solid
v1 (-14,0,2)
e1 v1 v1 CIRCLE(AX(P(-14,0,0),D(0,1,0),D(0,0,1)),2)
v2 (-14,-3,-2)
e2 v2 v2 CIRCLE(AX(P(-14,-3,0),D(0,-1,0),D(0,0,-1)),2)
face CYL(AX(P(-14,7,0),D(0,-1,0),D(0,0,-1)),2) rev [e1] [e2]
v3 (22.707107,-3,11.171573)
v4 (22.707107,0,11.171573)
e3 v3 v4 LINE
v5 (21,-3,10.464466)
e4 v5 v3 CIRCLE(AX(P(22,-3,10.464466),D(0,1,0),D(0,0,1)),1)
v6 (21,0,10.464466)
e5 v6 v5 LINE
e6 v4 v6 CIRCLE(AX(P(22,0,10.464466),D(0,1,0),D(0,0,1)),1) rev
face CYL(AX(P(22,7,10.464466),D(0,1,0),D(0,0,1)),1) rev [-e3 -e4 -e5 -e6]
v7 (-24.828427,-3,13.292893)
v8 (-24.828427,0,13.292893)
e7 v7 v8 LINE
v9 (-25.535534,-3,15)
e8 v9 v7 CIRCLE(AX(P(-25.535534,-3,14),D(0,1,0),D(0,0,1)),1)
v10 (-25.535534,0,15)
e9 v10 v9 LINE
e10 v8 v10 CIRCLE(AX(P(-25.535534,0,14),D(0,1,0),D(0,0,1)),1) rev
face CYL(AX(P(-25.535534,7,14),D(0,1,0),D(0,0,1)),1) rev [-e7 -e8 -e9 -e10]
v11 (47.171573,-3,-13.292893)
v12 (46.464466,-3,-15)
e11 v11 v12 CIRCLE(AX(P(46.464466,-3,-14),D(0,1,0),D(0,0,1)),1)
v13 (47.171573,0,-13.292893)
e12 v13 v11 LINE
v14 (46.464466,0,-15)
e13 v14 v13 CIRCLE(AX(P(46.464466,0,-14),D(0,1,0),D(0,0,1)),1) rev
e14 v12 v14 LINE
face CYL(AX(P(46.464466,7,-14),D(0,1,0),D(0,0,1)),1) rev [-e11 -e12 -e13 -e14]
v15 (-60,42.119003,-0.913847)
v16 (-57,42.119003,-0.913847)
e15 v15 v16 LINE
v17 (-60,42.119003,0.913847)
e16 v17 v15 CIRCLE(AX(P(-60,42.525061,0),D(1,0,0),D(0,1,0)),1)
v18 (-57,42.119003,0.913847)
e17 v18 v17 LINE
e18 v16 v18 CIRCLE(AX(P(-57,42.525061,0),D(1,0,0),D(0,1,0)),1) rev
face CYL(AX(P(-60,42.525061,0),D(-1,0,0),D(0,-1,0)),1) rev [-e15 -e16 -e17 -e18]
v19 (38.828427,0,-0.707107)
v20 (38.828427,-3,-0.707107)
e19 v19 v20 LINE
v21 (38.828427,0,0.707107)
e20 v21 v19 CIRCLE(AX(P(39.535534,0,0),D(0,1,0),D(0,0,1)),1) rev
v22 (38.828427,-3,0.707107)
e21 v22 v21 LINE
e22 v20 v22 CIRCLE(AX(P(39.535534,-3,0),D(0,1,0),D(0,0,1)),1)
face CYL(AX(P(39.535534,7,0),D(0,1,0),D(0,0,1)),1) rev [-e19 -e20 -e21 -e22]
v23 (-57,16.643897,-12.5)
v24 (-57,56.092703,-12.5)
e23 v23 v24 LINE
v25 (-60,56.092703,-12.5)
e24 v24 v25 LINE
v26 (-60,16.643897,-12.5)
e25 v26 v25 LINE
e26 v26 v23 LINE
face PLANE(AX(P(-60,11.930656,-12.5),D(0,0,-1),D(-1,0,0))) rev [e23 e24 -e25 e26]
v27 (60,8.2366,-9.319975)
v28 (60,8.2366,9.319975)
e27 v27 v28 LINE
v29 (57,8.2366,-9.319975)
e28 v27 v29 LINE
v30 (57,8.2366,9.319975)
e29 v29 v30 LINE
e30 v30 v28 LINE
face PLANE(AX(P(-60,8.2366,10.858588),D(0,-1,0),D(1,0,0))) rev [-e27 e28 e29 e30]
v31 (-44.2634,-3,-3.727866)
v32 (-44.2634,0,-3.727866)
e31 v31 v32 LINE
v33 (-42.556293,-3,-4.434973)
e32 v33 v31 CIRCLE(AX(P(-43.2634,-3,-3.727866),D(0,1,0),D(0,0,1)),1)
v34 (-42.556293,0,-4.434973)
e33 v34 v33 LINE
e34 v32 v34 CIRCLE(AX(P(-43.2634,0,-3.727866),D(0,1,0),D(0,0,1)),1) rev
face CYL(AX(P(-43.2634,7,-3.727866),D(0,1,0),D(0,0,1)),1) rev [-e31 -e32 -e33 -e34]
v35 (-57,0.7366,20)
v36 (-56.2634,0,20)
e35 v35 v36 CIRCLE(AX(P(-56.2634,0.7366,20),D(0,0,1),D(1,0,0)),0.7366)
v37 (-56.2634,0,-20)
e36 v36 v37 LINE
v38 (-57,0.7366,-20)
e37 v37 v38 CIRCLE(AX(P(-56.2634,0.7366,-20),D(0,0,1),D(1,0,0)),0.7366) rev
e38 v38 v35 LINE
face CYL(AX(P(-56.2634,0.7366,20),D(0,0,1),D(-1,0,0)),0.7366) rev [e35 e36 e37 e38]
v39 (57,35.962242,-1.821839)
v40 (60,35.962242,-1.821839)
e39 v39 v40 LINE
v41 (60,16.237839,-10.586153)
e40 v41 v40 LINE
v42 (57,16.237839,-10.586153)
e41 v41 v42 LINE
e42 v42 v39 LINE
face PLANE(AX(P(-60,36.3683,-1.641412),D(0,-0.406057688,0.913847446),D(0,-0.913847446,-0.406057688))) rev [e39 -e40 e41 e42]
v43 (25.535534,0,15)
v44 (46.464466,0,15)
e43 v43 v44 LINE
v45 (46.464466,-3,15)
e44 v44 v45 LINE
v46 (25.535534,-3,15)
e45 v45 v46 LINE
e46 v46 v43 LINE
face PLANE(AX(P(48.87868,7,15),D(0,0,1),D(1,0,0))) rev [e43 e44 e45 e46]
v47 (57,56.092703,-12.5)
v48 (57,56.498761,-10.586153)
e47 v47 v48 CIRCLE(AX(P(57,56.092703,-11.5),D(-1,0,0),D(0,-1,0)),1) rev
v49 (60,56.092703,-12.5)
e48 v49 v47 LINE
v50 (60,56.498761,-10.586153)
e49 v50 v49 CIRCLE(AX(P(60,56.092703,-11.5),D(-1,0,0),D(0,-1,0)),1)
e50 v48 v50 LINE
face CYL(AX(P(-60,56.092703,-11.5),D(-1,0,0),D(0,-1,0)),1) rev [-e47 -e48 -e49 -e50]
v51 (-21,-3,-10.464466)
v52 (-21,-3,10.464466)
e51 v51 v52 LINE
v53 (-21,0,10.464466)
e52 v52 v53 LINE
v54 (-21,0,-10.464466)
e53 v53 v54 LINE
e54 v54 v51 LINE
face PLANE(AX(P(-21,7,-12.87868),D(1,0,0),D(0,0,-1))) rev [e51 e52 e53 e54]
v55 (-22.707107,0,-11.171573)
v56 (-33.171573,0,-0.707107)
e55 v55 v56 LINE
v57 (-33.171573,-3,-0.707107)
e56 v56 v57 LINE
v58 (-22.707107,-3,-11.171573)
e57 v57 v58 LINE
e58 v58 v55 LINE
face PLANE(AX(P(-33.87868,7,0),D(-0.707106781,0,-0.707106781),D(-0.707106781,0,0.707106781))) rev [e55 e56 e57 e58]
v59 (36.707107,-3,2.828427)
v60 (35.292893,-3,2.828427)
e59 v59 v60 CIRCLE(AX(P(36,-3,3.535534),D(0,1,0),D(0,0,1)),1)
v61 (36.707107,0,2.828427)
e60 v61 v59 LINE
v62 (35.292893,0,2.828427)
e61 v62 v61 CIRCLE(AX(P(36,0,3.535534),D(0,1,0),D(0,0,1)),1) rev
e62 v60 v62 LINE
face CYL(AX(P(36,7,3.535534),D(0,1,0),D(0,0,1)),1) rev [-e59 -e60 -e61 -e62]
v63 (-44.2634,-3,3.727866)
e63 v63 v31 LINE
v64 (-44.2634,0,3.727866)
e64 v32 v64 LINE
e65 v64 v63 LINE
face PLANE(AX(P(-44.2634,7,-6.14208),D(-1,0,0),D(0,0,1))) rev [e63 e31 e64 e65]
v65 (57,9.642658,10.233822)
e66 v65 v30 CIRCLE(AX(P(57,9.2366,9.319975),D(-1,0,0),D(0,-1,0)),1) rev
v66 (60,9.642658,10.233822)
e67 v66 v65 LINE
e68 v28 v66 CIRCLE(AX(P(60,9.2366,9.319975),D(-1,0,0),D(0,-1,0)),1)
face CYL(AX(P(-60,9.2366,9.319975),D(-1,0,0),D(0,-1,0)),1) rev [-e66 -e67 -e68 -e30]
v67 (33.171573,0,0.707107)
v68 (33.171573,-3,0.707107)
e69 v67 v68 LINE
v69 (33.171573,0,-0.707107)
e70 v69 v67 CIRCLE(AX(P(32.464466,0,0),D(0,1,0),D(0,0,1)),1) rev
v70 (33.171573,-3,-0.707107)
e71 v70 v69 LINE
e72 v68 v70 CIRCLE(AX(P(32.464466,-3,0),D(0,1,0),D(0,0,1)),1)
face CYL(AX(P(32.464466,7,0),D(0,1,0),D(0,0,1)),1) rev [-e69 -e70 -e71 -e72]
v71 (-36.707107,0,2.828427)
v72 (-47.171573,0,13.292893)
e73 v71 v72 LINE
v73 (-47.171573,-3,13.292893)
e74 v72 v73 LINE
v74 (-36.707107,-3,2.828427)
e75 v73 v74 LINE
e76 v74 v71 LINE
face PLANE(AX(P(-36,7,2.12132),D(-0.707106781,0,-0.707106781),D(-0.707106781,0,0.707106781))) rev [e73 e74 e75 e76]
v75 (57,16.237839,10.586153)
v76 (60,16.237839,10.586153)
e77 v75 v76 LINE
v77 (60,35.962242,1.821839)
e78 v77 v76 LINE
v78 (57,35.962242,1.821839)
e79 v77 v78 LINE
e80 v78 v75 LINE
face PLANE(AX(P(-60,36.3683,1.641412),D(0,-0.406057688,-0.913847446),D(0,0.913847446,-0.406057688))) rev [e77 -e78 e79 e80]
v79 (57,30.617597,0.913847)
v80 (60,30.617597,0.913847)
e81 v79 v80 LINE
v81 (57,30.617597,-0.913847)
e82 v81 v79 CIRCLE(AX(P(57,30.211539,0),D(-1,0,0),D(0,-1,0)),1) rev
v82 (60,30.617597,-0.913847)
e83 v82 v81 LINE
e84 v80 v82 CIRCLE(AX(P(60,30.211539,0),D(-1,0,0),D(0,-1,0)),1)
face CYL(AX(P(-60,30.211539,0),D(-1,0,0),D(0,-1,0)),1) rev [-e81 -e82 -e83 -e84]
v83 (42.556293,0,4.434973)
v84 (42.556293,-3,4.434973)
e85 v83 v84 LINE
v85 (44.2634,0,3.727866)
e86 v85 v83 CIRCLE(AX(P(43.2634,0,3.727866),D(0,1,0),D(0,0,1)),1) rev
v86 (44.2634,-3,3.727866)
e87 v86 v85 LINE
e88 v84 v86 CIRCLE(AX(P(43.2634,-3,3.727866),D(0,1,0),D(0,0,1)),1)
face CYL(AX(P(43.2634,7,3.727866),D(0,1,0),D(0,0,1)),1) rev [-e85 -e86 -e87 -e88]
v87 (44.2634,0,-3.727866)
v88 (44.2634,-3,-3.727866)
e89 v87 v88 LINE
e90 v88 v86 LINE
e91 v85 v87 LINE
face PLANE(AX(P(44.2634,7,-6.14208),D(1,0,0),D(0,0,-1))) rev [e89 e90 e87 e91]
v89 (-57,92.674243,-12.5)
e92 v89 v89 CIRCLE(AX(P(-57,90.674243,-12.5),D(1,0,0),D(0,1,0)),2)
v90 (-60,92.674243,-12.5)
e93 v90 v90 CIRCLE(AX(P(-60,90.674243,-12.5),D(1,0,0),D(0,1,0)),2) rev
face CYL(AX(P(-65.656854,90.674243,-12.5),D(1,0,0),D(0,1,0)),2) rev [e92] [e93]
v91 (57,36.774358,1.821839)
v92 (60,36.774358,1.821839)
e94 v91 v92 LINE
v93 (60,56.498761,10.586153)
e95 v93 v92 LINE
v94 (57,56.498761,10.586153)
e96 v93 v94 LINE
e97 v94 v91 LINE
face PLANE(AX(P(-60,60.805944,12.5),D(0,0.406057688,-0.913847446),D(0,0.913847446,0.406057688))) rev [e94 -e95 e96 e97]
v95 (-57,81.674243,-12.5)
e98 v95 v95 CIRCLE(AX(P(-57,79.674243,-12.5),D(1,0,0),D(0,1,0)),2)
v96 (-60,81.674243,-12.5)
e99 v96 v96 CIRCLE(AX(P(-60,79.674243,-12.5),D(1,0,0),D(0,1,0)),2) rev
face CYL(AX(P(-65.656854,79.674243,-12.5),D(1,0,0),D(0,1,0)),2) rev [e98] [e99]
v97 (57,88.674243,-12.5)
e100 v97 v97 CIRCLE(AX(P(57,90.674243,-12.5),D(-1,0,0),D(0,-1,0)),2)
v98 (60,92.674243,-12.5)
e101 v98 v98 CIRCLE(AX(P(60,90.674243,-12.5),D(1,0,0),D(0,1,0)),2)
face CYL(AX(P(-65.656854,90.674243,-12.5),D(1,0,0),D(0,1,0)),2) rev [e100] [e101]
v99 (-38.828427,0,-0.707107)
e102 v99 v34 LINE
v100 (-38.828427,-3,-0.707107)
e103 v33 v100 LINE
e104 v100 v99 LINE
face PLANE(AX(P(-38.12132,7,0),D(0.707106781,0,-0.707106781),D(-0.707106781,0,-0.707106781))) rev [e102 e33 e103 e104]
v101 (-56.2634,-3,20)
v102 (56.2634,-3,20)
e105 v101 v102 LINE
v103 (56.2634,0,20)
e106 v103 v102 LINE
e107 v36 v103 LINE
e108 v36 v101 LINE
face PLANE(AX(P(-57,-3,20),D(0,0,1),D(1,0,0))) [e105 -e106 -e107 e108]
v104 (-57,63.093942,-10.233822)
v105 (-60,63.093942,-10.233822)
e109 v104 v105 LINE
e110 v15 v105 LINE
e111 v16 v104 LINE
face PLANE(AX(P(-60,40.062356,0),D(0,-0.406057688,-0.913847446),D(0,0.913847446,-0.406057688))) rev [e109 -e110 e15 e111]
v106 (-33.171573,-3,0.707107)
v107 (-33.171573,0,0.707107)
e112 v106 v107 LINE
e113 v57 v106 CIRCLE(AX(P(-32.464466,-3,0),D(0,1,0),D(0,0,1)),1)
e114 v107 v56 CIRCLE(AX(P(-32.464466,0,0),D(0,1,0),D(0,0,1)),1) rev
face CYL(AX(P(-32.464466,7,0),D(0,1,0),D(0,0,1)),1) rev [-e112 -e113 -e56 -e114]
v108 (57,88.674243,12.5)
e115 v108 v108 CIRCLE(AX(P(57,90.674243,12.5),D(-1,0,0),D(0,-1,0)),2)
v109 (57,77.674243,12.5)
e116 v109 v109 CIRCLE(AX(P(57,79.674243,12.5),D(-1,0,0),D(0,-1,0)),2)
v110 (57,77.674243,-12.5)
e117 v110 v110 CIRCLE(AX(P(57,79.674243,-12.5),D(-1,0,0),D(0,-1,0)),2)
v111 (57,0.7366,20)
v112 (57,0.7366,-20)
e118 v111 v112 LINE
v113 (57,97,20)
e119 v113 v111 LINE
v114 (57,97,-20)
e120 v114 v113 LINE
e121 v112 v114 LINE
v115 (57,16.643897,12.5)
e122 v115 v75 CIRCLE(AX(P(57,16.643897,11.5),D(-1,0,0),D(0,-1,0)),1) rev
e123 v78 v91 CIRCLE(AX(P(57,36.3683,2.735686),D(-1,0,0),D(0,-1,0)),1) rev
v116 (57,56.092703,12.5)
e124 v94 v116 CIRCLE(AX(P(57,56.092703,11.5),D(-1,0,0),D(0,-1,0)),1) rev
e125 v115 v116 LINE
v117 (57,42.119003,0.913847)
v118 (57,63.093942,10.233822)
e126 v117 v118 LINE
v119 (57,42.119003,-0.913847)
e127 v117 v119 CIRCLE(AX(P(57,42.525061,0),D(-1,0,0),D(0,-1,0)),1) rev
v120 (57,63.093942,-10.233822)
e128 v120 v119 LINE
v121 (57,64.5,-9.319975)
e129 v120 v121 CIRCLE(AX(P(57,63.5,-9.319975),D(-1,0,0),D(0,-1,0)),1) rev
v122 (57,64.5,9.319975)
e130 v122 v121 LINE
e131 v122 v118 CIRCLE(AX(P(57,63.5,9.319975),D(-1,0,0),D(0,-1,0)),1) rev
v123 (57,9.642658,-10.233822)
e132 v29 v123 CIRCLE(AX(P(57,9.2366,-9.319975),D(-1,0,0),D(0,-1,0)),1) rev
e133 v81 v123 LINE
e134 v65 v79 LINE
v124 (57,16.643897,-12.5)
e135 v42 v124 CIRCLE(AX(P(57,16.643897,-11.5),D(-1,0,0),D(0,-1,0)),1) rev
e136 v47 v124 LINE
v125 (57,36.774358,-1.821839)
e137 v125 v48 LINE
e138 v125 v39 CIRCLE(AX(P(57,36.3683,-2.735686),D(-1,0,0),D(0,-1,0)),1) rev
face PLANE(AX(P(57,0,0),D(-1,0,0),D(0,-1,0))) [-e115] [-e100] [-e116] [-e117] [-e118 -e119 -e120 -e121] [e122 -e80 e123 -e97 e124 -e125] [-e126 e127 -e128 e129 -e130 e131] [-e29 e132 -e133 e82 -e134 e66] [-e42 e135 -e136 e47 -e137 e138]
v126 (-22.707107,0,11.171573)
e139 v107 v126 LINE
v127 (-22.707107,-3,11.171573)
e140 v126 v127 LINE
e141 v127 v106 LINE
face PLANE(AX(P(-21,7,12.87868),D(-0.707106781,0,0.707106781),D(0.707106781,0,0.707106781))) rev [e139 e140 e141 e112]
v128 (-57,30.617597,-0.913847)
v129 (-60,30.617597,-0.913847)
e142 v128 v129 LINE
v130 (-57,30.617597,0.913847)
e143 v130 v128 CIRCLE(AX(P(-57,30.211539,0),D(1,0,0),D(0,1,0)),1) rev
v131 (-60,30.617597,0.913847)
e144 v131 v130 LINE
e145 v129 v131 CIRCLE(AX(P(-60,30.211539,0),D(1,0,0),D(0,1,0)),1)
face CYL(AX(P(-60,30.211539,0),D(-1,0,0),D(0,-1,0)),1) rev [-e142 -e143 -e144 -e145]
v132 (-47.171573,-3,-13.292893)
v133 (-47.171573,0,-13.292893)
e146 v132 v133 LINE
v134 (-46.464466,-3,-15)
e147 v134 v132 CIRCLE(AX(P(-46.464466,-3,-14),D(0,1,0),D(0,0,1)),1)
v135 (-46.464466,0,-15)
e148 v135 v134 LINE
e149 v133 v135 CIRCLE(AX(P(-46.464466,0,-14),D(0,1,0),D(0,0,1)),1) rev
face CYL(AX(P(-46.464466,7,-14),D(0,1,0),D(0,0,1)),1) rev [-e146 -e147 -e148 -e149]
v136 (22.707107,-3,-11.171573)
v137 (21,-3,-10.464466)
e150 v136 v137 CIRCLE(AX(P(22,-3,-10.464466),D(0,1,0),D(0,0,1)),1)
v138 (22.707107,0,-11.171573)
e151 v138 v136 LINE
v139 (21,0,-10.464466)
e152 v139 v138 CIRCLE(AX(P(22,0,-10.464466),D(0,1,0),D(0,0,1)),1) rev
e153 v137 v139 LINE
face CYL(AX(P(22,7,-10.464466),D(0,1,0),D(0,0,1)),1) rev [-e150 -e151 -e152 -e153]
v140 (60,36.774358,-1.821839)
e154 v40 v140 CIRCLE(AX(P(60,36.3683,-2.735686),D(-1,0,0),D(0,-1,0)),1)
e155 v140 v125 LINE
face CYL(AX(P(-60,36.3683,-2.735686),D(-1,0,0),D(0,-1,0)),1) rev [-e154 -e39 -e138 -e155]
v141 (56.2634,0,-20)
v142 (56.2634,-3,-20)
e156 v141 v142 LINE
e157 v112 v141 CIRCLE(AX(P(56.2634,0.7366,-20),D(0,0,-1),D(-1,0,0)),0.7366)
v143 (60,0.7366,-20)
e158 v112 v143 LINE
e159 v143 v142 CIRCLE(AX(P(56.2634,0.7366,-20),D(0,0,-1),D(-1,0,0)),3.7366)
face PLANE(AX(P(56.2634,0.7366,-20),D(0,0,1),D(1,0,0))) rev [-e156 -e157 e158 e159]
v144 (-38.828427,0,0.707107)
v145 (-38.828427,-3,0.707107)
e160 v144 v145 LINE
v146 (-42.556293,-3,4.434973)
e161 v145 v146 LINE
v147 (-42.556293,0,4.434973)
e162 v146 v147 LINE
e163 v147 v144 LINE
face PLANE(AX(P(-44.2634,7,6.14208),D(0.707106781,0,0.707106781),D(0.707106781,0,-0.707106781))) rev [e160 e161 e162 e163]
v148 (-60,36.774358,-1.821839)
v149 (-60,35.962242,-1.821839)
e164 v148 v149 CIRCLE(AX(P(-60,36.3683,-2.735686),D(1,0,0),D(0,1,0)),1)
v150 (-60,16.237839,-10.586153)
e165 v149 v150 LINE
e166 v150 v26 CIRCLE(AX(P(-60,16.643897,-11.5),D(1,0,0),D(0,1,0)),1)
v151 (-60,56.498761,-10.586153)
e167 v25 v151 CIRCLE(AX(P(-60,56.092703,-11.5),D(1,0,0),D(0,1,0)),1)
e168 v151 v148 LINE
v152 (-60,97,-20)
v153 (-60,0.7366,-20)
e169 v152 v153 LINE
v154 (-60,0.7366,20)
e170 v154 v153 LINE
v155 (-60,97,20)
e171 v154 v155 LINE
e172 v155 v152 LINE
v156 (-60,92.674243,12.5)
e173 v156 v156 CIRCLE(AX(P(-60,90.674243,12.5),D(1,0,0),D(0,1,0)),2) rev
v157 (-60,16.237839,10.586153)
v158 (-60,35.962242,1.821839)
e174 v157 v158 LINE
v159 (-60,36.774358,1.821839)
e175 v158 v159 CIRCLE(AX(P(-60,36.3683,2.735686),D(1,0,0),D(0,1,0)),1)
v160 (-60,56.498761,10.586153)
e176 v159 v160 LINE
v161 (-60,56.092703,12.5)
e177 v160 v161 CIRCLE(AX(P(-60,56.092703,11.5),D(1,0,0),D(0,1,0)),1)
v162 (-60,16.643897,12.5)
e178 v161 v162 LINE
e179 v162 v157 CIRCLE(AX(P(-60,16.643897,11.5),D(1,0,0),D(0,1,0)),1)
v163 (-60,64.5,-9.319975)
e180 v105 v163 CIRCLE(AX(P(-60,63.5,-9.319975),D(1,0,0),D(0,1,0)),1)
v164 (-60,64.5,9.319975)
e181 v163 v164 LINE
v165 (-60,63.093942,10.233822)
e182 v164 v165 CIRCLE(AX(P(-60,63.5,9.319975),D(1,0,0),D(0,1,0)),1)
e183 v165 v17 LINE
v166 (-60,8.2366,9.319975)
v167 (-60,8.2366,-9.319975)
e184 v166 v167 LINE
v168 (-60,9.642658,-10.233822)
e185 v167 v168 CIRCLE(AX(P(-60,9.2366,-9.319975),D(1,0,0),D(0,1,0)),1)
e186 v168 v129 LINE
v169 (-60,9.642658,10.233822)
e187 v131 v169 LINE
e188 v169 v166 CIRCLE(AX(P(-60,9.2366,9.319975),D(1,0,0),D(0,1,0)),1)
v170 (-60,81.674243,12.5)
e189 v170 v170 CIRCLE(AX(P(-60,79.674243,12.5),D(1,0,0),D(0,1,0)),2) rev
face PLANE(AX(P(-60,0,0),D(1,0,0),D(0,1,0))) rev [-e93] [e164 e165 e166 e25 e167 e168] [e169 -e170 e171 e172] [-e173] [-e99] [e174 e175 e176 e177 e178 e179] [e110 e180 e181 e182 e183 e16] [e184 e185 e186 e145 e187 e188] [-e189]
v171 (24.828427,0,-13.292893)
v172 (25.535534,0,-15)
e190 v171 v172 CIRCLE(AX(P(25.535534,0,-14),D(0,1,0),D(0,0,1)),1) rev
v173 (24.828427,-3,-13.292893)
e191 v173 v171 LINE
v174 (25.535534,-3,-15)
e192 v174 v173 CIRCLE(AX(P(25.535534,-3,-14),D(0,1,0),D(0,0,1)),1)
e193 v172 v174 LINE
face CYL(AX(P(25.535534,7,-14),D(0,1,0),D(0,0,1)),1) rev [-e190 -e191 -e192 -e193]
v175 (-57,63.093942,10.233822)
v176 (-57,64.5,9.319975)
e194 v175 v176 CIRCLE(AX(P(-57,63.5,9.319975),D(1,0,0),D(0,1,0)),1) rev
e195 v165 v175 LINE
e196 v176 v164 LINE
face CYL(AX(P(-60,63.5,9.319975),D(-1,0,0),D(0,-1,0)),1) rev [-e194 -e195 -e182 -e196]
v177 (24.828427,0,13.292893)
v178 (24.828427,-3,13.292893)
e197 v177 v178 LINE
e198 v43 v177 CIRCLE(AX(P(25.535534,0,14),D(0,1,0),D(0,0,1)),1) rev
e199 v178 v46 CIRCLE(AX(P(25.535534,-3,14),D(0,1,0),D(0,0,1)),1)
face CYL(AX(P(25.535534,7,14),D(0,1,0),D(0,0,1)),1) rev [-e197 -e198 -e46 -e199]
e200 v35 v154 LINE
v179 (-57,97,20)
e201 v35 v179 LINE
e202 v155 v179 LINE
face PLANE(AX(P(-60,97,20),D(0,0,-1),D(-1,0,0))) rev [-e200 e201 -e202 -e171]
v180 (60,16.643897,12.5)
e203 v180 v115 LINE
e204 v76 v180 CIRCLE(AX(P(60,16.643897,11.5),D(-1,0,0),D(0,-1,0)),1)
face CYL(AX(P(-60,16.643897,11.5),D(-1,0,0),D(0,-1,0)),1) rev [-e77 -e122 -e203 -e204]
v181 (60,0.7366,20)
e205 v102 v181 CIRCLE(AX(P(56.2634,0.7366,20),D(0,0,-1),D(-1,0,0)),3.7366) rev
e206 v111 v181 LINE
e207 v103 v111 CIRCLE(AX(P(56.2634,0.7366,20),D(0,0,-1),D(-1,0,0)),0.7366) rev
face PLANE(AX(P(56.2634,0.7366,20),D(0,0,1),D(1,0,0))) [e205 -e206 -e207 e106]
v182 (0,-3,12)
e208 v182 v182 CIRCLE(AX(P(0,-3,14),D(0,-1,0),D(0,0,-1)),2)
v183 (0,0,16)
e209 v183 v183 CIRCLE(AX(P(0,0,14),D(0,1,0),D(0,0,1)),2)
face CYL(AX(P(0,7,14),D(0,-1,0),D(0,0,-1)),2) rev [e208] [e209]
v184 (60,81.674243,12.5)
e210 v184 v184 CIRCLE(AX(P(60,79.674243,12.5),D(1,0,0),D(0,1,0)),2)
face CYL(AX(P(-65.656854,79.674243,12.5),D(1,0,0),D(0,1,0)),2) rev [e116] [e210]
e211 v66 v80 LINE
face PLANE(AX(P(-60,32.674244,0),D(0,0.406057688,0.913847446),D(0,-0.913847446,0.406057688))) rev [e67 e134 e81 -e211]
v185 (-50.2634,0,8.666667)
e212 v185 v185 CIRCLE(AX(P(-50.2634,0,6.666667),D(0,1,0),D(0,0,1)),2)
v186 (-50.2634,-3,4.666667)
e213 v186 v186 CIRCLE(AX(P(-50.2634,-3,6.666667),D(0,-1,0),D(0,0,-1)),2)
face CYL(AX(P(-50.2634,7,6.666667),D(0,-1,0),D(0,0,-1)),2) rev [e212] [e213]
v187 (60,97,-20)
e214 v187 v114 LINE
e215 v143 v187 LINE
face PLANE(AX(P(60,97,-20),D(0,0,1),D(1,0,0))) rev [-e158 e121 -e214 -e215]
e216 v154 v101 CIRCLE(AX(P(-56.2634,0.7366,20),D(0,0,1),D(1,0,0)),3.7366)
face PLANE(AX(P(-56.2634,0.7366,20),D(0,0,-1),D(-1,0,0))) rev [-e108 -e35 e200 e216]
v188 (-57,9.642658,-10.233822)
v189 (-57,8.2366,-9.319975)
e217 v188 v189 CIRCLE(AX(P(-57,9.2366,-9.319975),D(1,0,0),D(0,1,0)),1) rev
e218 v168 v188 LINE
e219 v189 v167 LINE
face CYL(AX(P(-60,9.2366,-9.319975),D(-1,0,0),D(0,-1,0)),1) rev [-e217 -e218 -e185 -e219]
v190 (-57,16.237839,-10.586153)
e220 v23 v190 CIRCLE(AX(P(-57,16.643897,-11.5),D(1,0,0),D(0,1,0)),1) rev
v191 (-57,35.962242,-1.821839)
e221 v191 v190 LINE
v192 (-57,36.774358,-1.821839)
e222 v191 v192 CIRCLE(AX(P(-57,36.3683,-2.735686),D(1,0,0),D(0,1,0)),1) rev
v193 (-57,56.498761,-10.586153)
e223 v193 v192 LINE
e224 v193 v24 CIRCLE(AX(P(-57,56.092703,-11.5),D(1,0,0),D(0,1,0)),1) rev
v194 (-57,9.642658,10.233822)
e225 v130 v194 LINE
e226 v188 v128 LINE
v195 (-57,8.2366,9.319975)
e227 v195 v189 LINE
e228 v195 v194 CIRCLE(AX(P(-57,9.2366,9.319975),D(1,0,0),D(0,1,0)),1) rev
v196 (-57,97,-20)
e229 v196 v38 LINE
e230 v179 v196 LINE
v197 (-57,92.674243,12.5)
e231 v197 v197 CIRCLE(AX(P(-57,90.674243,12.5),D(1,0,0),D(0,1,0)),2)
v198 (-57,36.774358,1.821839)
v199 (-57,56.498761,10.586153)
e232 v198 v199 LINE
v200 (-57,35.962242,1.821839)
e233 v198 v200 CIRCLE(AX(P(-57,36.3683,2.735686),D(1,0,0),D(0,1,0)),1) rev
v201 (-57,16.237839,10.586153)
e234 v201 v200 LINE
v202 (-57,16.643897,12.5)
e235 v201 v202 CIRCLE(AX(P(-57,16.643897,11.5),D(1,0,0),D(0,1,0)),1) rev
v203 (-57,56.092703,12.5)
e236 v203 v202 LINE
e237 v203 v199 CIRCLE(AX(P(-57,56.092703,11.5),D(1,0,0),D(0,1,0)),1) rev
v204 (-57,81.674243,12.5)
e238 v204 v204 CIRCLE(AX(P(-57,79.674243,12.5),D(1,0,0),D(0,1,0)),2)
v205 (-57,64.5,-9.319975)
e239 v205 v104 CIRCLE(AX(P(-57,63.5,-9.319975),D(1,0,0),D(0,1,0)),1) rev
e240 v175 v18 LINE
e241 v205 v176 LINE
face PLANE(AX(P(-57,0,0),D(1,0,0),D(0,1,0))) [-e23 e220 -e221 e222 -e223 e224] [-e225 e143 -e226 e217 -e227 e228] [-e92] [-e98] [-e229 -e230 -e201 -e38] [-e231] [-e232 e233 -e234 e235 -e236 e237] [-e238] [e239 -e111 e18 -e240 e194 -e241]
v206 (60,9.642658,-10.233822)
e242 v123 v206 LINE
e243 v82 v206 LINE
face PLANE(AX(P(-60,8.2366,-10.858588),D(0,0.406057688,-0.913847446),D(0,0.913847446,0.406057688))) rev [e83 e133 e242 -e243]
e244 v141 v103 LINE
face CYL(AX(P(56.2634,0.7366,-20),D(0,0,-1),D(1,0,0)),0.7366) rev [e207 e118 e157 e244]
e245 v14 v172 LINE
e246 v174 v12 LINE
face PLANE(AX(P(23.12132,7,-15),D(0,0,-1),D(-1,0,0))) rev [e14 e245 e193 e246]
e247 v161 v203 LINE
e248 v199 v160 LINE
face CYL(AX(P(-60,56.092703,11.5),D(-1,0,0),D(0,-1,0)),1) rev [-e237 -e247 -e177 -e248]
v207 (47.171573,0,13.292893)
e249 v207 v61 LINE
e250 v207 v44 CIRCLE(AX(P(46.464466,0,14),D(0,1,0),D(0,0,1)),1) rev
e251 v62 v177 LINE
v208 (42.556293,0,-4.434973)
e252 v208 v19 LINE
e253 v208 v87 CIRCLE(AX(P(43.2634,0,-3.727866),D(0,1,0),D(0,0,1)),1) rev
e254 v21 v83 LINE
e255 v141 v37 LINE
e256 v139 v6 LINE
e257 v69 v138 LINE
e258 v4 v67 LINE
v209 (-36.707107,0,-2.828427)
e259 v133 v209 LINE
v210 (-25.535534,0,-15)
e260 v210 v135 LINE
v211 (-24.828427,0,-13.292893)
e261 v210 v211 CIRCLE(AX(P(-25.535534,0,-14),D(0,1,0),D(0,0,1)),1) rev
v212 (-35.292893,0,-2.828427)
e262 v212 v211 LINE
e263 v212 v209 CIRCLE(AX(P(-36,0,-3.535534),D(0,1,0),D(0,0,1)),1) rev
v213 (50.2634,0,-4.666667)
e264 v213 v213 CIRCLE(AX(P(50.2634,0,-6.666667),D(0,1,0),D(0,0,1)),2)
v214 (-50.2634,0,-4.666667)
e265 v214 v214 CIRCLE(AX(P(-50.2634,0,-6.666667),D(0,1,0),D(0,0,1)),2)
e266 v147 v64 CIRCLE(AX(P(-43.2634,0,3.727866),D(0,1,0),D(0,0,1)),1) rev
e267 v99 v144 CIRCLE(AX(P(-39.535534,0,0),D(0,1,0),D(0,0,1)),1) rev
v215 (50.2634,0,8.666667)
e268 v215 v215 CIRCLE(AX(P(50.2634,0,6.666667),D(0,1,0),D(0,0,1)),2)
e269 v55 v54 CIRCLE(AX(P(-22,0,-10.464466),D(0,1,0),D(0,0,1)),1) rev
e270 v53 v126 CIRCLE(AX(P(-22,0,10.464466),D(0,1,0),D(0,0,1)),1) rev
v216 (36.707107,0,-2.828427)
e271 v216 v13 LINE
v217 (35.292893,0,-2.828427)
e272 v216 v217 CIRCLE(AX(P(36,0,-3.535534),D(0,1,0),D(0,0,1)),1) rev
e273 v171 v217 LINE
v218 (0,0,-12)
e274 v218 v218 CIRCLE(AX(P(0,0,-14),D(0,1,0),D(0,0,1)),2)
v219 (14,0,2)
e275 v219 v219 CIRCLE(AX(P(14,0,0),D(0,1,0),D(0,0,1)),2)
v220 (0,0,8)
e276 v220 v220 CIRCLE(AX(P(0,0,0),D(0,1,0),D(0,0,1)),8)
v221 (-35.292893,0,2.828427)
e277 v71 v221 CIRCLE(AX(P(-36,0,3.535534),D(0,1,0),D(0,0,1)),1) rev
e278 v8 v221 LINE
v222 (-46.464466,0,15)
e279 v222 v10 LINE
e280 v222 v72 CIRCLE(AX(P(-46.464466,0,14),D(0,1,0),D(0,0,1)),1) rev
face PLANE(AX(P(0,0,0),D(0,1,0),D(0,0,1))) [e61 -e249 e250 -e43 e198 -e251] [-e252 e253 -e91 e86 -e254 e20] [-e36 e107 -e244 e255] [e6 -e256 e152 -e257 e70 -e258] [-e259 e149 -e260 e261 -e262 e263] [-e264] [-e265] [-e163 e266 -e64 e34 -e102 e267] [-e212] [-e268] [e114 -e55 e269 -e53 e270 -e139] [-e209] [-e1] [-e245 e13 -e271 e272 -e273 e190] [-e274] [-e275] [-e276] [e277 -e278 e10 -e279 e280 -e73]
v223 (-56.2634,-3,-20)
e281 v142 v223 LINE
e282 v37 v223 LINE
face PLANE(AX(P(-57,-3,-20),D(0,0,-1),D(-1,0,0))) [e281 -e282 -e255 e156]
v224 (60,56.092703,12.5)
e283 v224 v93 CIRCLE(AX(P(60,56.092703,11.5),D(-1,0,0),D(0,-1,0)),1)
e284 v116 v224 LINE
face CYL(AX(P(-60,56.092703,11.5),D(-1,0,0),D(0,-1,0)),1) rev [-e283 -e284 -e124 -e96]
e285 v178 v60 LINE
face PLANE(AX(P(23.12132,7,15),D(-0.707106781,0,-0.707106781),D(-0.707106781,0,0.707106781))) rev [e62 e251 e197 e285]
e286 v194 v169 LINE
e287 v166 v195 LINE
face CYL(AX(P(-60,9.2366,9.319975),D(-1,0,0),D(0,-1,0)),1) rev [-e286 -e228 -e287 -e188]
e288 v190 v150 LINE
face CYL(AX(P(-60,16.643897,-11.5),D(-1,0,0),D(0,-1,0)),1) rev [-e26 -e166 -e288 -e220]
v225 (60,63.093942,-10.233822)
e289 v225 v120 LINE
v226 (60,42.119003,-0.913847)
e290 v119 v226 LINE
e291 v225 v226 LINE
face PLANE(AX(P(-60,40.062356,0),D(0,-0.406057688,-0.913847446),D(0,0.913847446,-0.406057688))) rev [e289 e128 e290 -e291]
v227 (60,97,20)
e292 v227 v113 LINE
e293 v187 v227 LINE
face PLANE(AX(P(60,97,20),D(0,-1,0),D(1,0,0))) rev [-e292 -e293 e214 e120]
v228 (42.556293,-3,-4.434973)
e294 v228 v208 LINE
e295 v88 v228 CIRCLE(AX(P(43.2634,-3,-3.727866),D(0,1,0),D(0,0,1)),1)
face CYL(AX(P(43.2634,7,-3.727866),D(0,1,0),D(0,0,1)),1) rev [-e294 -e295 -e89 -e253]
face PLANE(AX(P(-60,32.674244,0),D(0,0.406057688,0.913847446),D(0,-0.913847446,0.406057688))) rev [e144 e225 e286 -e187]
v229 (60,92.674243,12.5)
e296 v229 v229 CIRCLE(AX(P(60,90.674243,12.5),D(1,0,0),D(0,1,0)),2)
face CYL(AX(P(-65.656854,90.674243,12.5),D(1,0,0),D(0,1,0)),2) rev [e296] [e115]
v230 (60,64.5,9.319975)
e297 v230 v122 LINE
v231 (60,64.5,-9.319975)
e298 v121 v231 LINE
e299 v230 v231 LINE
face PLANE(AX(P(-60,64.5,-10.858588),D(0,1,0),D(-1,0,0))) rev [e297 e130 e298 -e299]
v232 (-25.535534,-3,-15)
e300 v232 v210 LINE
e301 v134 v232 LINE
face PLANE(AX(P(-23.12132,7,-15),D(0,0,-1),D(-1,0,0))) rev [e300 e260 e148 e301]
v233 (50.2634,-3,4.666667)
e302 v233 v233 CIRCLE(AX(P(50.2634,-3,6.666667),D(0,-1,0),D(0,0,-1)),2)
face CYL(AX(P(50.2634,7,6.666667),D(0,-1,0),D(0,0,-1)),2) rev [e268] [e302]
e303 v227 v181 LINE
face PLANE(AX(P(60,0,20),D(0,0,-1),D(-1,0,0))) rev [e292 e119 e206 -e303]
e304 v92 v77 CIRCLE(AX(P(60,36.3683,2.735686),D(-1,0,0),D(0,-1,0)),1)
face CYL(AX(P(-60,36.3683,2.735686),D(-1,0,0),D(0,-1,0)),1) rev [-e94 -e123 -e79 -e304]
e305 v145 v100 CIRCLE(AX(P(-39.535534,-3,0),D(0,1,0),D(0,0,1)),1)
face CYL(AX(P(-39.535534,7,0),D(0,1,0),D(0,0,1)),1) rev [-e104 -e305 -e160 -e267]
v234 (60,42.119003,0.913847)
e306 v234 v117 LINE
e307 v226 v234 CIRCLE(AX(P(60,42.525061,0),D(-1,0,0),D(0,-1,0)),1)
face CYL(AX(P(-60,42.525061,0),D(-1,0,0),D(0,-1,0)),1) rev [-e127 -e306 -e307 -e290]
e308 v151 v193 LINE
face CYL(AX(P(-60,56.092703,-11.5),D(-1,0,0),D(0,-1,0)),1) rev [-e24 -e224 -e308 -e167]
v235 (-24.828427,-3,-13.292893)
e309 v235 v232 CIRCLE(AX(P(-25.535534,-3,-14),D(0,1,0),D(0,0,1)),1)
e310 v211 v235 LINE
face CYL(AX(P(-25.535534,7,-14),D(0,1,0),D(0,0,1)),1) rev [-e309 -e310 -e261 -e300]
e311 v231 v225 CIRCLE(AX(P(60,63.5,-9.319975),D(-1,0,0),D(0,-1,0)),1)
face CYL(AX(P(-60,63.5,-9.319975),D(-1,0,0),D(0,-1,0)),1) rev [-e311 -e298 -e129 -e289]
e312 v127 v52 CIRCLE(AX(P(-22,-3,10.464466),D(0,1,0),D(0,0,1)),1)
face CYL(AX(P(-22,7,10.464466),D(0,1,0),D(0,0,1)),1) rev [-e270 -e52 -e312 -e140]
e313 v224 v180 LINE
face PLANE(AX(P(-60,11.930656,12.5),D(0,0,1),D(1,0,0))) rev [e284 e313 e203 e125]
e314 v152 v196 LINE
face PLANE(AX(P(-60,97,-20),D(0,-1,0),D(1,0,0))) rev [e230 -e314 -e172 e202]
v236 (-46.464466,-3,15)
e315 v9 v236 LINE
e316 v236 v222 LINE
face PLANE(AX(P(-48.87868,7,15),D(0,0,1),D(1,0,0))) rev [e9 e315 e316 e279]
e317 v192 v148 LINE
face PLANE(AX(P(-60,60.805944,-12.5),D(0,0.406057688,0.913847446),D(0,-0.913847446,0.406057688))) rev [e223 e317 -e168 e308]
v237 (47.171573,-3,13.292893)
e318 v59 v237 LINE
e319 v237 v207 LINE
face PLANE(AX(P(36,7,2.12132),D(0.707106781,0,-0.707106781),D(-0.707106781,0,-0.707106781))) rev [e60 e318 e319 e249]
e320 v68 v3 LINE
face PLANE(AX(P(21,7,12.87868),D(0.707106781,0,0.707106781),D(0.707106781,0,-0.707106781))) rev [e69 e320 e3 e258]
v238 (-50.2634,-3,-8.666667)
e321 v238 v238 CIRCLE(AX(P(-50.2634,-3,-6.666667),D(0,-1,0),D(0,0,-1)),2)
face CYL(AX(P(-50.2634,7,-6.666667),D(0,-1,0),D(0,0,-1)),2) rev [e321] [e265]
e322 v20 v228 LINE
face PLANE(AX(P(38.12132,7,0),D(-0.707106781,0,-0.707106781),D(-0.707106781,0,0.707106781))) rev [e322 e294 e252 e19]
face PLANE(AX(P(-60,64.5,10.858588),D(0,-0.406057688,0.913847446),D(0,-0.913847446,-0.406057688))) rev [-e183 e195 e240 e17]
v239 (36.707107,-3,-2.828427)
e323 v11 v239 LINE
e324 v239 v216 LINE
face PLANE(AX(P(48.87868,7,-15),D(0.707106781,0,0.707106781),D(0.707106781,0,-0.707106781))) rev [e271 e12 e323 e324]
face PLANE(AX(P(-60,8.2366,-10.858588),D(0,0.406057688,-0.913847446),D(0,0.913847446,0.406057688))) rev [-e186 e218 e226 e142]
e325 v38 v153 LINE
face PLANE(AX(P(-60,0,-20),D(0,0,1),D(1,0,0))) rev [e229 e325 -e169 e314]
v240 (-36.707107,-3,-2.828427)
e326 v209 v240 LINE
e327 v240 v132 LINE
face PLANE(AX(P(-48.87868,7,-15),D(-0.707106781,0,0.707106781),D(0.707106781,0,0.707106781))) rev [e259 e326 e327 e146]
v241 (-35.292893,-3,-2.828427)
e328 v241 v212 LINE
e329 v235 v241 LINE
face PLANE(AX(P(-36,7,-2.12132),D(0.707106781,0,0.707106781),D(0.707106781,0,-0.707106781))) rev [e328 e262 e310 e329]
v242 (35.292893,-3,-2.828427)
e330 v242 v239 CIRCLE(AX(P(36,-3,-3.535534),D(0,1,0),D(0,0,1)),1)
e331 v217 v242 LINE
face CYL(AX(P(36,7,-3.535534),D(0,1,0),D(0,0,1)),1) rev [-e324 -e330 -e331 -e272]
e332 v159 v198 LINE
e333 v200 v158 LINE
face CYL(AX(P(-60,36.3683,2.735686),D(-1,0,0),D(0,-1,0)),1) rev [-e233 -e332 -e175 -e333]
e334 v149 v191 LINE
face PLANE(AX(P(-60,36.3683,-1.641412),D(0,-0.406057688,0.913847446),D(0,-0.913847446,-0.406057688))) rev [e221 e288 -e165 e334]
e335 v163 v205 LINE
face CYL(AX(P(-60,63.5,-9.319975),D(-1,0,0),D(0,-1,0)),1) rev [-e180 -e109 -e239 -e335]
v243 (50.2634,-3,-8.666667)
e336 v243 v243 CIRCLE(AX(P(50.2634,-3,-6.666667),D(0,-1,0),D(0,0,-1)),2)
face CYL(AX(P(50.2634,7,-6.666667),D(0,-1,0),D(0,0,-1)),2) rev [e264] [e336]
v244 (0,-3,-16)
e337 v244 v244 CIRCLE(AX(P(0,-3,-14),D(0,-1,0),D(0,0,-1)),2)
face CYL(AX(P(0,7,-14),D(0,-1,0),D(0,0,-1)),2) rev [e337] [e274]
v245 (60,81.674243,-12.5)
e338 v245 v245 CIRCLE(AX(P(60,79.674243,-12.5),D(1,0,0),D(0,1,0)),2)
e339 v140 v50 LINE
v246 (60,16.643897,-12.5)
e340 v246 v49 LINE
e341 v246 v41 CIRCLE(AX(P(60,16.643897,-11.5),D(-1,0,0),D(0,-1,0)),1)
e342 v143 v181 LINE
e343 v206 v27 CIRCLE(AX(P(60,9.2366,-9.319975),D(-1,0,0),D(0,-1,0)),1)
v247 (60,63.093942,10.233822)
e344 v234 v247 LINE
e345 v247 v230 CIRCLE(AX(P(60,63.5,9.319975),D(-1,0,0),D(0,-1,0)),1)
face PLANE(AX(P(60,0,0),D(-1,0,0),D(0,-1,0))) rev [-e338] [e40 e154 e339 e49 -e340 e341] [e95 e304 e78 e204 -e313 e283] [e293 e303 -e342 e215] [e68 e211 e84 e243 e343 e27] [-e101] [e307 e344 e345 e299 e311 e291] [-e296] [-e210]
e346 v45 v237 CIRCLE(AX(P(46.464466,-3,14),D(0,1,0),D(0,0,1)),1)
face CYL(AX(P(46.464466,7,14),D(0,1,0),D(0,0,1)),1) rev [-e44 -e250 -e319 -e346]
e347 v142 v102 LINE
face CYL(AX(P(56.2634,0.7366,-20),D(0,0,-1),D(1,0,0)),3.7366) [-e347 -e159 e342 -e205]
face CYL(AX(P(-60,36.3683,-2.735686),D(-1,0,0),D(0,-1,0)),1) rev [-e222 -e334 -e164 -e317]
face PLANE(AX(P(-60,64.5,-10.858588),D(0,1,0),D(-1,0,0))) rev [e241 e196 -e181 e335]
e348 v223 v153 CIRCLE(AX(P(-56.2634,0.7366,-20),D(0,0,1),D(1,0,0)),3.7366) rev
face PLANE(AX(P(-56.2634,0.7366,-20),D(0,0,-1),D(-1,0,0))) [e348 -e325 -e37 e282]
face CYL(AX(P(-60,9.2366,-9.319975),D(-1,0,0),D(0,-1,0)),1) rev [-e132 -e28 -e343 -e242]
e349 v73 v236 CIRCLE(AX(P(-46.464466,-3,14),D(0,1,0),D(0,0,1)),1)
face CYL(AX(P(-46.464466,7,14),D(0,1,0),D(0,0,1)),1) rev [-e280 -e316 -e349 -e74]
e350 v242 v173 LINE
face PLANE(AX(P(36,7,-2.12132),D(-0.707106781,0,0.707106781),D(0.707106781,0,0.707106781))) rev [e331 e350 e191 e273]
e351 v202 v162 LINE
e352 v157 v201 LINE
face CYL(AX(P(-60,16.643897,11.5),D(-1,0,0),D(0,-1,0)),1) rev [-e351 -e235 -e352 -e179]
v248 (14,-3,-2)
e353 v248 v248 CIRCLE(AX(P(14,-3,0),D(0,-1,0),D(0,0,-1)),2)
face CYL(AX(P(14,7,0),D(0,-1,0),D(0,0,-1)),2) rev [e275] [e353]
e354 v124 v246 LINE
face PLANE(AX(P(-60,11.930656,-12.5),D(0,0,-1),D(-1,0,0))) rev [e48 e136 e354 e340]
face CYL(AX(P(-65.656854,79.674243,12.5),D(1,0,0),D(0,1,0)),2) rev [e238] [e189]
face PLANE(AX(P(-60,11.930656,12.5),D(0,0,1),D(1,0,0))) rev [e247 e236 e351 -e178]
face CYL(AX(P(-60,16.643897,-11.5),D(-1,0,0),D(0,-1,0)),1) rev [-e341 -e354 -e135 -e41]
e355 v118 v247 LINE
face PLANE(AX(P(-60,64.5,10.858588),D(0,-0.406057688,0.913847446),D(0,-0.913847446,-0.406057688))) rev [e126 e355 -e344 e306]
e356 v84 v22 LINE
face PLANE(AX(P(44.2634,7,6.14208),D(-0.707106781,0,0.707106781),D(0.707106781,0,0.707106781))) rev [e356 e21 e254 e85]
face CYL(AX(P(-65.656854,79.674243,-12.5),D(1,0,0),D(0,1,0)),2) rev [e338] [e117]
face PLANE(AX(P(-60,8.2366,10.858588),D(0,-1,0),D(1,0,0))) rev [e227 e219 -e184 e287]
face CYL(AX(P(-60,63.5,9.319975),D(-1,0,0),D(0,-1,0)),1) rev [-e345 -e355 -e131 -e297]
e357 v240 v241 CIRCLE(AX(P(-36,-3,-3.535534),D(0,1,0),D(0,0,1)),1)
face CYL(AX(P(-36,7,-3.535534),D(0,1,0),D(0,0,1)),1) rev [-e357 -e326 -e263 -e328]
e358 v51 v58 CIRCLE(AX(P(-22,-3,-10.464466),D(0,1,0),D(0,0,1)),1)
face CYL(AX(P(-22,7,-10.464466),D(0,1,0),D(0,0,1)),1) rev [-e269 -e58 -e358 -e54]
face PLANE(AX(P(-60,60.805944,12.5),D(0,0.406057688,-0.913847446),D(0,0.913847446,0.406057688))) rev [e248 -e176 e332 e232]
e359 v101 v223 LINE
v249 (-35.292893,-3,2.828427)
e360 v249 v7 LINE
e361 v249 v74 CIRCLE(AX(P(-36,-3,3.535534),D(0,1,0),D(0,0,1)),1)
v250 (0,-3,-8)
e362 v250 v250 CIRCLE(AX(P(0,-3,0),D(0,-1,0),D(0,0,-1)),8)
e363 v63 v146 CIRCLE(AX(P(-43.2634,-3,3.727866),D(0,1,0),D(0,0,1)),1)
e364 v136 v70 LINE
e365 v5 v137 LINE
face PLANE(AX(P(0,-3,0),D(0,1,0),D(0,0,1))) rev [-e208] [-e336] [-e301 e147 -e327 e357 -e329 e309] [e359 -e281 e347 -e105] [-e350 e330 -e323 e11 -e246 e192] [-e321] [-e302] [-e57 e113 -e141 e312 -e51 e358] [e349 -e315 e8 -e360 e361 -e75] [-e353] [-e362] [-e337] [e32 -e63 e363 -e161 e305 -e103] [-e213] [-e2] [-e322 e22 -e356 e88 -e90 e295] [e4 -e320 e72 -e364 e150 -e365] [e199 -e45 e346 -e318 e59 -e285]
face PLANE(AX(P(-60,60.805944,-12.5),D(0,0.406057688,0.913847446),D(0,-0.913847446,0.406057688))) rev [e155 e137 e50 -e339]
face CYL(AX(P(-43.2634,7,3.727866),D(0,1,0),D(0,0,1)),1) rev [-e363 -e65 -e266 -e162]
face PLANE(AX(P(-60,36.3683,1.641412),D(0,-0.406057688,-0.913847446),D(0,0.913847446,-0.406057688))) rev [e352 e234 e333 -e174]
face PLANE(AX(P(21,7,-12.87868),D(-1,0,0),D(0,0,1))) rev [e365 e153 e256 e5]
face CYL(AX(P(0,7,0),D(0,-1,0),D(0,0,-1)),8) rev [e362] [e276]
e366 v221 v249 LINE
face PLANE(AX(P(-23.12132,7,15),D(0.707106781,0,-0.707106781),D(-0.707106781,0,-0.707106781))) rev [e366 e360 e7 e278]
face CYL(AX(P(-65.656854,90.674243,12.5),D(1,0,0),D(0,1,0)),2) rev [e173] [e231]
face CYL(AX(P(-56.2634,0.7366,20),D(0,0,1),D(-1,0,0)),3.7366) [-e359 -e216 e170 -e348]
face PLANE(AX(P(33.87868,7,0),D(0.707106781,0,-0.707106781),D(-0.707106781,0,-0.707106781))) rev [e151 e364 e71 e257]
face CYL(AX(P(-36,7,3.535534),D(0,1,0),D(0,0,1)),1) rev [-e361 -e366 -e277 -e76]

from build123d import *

# Parameters (mm, degrees)
SKETCH3_W                    = 114
SKETCH3_H                    = 40
BASE_FLANGE1_DEPTH           = 3
EDGE_FLANGE1_STRIP_W         = 13.4732
EDGE_FLANGE1_STRIP_H         = 3
EDGE_FLANGE1_STRIP_CUT_DEPTH = 40
EDGE_FLANGE1_DEPTH           = 40
EDGE_FLANGE2_STRIP_W         = 13.4732
EDGE_FLANGE2_STRIP_H         = 3
EDGE_FLANGE2_STRIP_CUT_DEPTH = 40
EDGE_FLANGE2_DEPTH           = 40
SKETCH11_R                   = 8
SKETCH11_R_2                 = 2
CUT_EXTRUDE1_DEPTH           = 10
CUT_EXTRUDE2_REACH           = 157.592
SKETCH12_R                   = 2
CUT_EXTRUDE3_DEPTH           = 156.592416268
CUT_EXTRUDE3_DEPTH_BACK      = 156.592416268
CUT_EXTRUDE4_DEPTH           = 10
FILLET1_R                    = 1


# Sheet-metal steps are written as plain solids
with BuildPart() as part:
    # Sketch3 → Base-Flange1 (new body)
    with BuildSketch(Plane(origin=(0, 0, 0), x_dir=(1, 0, 0), z_dir=(0, 1, 0))):
        Rectangle(SKETCH3_W, SKETCH3_H)
    extrude(amount=-BASE_FLANGE1_DEPTH)

    # Edge-Flange1 strip (across the edge) → Edge-Flange1 strip cut (cut)
    with BuildSketch(Plane(origin=(-57, 0, -20), x_dir=(1, 0, 0), z_dir=(0, 0, 1))):
        with Locations((-6, -1.5)):
            Rectangle(EDGE_FLANGE1_STRIP_W, EDGE_FLANGE1_STRIP_H)
    extrude(amount=EDGE_FLANGE1_STRIP_CUT_DEPTH, mode=Mode.SUBTRACT)

    # Edge-Flange1 section (across the edge) → Edge-Flange1 (add)
    with BuildSketch(Plane(origin=(-57, 0, -20), x_dir=(1, 0, 0), z_dir=(0, 0, 1))):
        with BuildLine():
            Line((-3, 0.7366), (-3, 97))
            Line((-3, 97), (0, 97))
            Line((0, 97), (0, 0.7366))
            ThreePointArc((0, 0.7366), (0.215745145, 0.215745145), (0.7366, 0))
            Line((0.7366, 0), (0.7366, -3))
            ThreePointArc((0.7366, -3), (-1.905575199, -1.905575199), (-3, 0.7366))
        make_face()
    extrude(amount=EDGE_FLANGE1_DEPTH)

    # Edge-Flange2 strip (across the edge) → Edge-Flange2 strip cut (cut)
    with BuildSketch(Plane(origin=(57, 0, 20), x_dir=(-1, 0, 0), z_dir=(0, 0, -1))):
        with Locations((-6, -1.5)):
            Rectangle(EDGE_FLANGE2_STRIP_W, EDGE_FLANGE2_STRIP_H)
    extrude(amount=EDGE_FLANGE2_STRIP_CUT_DEPTH, mode=Mode.SUBTRACT)

    # Edge-Flange2 section (across the edge) → Edge-Flange2 (add)
    with BuildSketch(Plane(origin=(57, 0, 20), x_dir=(-1, 0, 0), z_dir=(0, 0, -1))):
        with BuildLine():
            Line((-3, 0.7366), (-3, 97))
            Line((-3, 97), (0, 97))
            Line((0, 97), (0, 0.7366))
            ThreePointArc((0, 0.7366), (0.215745145, 0.215745145), (0.7366, 0))
            Line((0.7366, 0), (0.7366, -3))
            ThreePointArc((0.7366, -3), (-1.905575199, -1.905575199), (-3, 0.7366))
        make_face()
    extrude(amount=EDGE_FLANGE2_DEPTH)

    # Sketch11 → Cut-Extrude1 (cut)
    with BuildSketch(Plane(origin=(0, -3, 0), x_dir=(-1, 0, 0), z_dir=(0, -1, 0))):
        with Locations(Location((0, 0, 0), (0, 0, 90))):
            Circle(SKETCH11_R)
        with Locations(Location((0, 14, 0), (0, 0, 90))):
            Circle(SKETCH11_R_2)
        with Locations(Location((14, 0, 0), (0, 0, 90))):
            Circle(SKETCH11_R_2)
        with Locations(Location((0, -14, 0), (0, 0, 90))):
            Circle(SKETCH11_R_2)
        with Locations(Location((-14, 0, 0), (0, 0, 90))):
            Circle(SKETCH11_R_2)
        with Locations(Location((50.2634, 6.666666667, 0), (0, 0, 90))):
            Circle(SKETCH11_R_2)
        with Locations(Location((-50.2634, 6.666666667, 0), (0, 0, 90))):
            Circle(SKETCH11_R_2)
        with Locations(Location((50.2634, -6.666666667, 0), (0, 0, 90))):
            Circle(SKETCH11_R_2)
        with Locations(Location((-50.2634, -6.666666667, 0), (0, 0, 90))):
            Circle(SKETCH11_R_2)
    extrude(amount=-CUT_EXTRUDE1_DEPTH, mode=Mode.SUBTRACT)

    # Cut-Extrude2: up to this face of the body (flat: up to its plane)
    cut_extrude2_end = Plane(part.part.faces().sort_by_distance((-60, 48.8683, 0))[0])
    # Sketch12 → Cut-Extrude2 (cut, up to the picked face)
    with BuildSketch(Plane(origin=(60, 0, 0), x_dir=(0, 0, -1), z_dir=(1, 0, 0)), mode=Mode.PRIVATE) as cut_extrude2_sk1:
        with Locations(Location((12.5, 79.674243403, 0), (0, 0, 90))):
            Circle(SKETCH12_R)
    cut_extrude2_tool1 = split(extrude(cut_extrude2_sk1.sketch, amount=-CUT_EXTRUDE2_REACH, mode=Mode.PRIVATE), bisect_by=cut_extrude2_end, keep=Keep.BOTH, mode=Mode.PRIVATE)
    # Sketch12 → Cut-Extrude2 (cut, up to the picked face)
    with BuildSketch(Plane(origin=(60, 0, 0), x_dir=(0, 0, -1), z_dir=(1, 0, 0)), mode=Mode.PRIVATE) as cut_extrude2_sk2:
        with Locations(Location((12.5, 90.674243403, 0), (0, 0, 90))):
            Circle(SKETCH12_R)
    cut_extrude2_tool2 = split(extrude(cut_extrude2_sk2.sketch, amount=-CUT_EXTRUDE2_REACH, mode=Mode.PRIVATE), bisect_by=cut_extrude2_end, keep=Keep.BOTH, mode=Mode.PRIVATE)
    # Sketch12 → Cut-Extrude2 (cut, up to the picked face)
    with BuildSketch(Plane(origin=(60, 0, 0), x_dir=(0, 0, -1), z_dir=(1, 0, 0)), mode=Mode.PRIVATE) as cut_extrude2_sk3:
        with Locations(Location((-12.5, 79.674243403, 0), (0, 0, 90))):
            Circle(SKETCH12_R)
    cut_extrude2_tool3 = split(extrude(cut_extrude2_sk3.sketch, amount=-CUT_EXTRUDE2_REACH, mode=Mode.PRIVATE), bisect_by=cut_extrude2_end, keep=Keep.BOTH, mode=Mode.PRIVATE)
    # Sketch12 → Cut-Extrude2 (cut, up to the picked face)
    with BuildSketch(Plane(origin=(60, 0, 0), x_dir=(0, 0, -1), z_dir=(1, 0, 0)), mode=Mode.PRIVATE) as cut_extrude2_sk4:
        with Locations(Location((-12.5, 90.674243403, 0), (0, 0, 90))):
            Circle(SKETCH12_R)
    cut_extrude2_tool4 = split(extrude(cut_extrude2_sk4.sketch, amount=-CUT_EXTRUDE2_REACH, mode=Mode.PRIVATE), bisect_by=cut_extrude2_end, keep=Keep.BOTH, mode=Mode.PRIVATE)
    add(cut_extrude2_tool1.solids().sort_by(Axis((60, 79.674243, -12.5), (-1, 0, 0)))[0], mode=Mode.SUBTRACT)
    add(cut_extrude2_tool2.solids().sort_by(Axis((60, 90.674243, -12.5), (-1, 0, 0)))[0], mode=Mode.SUBTRACT)
    add(cut_extrude2_tool3.solids().sort_by(Axis((60, 79.674243, 12.5), (-1, 0, 0)))[0], mode=Mode.SUBTRACT)
    add(cut_extrude2_tool4.solids().sort_by(Axis((60, 90.674243, 12.5), (-1, 0, 0)))[0], mode=Mode.SUBTRACT)

    # Sketch14 → Cut-Extrude3 (cut, two sides: drawn at the far end of the back side and taken through both)
    with BuildSketch(Plane(origin=(60, 0, 0), x_dir=(0, 0, -1), z_dir=(1, 0, 0)).offset(-CUT_EXTRUDE3_DEPTH_BACK)):
        Polygon((-12.5, 60.805943605), (-1.641411821, 36.3683), (-12.5, 11.930656395), align=None)
        Polygon((-10.858588179, 64.5), (0, 40.062356395), (10.858588179, 64.5), align=None)
        Polygon((12.5, 60.805943605), (1.641411821, 36.3683), (12.5, 11.930656395), align=None)
        Polygon((10.858588179, 8.2366), (0, 32.674243605), (-10.858588179, 8.2366), align=None)
    extrude(amount=CUT_EXTRUDE3_DEPTH + CUT_EXTRUDE3_DEPTH_BACK, mode=Mode.SUBTRACT)

    # Sketch15 → Cut-Extrude4 (cut)
    with BuildSketch(Plane.XZ.offset(3)):
        Polygon((21, 12.878679656), (33.878679656, 0), (21, -12.878679656), align=None)
        Polygon((23.121320344, 15), (36, 2.121320344), (48.878679656, 15), align=None)
        Polygon((44.2634, 6.142079656), (38.121320344, 0), (44.2634, -6.142079656), align=None)
        Polygon((48.878679656, -15), (36, -2.121320344), (23.121320344, -15), align=None)
        Polygon((-23.121320344, -15), (-48.878679656, -15), (-36, -2.121320344), align=None)
        Polygon((-44.2634, -6.142079656), (-44.2634, 6.142079656), (-38.121320344, 0), align=None)
        Polygon((-48.878679656, 15), (-23.121320344, 15), (-36, 2.121320344), align=None)
        Polygon((-21, -12.878679656), (-21, 12.878679656), (-33.878679656, 0), align=None)
    extrude(amount=-CUT_EXTRUDE4_DEPTH, mode=Mode.SUBTRACT)

    # Fillet1
    fillet1_edges = [part.edges().sort_by_distance(p)[0] for p in [
        (58.5, 60.805943605, -12.5),
        (-58.5, 60.805943605, -12.5),
        (58.5, 11.930656395, -12.5),
        (-58.5, 11.930656395, -12.5),
        (58.5, 36.3683, -1.641411821),
        (-58.5, 36.3683, -1.641411821),
        (58.5, 64.5, 10.858588179),
        (-58.5, 64.5, 10.858588179),
        (58.5, 64.5, -10.858588179),
        (-58.5, 64.5, -10.858588179),
        (58.5, 40.062356395, 0),
        (-58.5, 40.062356395, 0),
        (58.5, 8.2366, -10.858588179),
        (-58.5, 8.2366, -10.858588179),
        (58.5, 8.2366, 10.858588179),
        (-58.5, 8.2366, 10.858588179),
        (58.5, 32.674243605, 0),
        (-58.5, 32.674243605, 0),
        (58.5, 11.930656395, 12.5),
        (-58.5, 11.930656395, 12.5),
        (58.5, 60.805943605, 12.5),
        (-58.5, 60.805943605, 12.5),
        (58.5, 36.3683, 1.641411821),
        (-58.5, 36.3683, 1.641411821),
        (-36, -1.5, -2.121320344),
        (-23.121320344, -1.5, -15),
        (-48.878679656, -1.5, -15),
        (48.878679656, -1.5, -15),
        (23.121320344, -1.5, -15),
        (36, -1.5, -2.121320344),
        (23.121320344, -1.5, 15),
        (48.878679656, -1.5, 15),
        (36, -1.5, 2.121320344),
        (44.2634, -1.5, 6.142079656),
        (44.2634, -1.5, -6.142079656),
        (38.121320344, -1.5, 0),
        (-21, -1.5, -12.878679656),
        (-33.878679656, -1.5, 0),
        (-21, -1.5, 12.878679656),
        (-38.121320344, -1.5, 0),
        (-44.2634, -1.5, -6.142079656),
        (-44.2634, -1.5, 6.142079656),
        (-36, -1.5, 2.121320344),
        (-48.878679656, -1.5, 15),
        (-23.121320344, -1.5, 15),
        (21, -1.5, -12.878679656),
        (21, -1.5, 12.878679656),
        (33.878679656, -1.5, 0),
    ]]
    fillet(fillet1_edges, radius=FILLET1_R)


solid = part.part
